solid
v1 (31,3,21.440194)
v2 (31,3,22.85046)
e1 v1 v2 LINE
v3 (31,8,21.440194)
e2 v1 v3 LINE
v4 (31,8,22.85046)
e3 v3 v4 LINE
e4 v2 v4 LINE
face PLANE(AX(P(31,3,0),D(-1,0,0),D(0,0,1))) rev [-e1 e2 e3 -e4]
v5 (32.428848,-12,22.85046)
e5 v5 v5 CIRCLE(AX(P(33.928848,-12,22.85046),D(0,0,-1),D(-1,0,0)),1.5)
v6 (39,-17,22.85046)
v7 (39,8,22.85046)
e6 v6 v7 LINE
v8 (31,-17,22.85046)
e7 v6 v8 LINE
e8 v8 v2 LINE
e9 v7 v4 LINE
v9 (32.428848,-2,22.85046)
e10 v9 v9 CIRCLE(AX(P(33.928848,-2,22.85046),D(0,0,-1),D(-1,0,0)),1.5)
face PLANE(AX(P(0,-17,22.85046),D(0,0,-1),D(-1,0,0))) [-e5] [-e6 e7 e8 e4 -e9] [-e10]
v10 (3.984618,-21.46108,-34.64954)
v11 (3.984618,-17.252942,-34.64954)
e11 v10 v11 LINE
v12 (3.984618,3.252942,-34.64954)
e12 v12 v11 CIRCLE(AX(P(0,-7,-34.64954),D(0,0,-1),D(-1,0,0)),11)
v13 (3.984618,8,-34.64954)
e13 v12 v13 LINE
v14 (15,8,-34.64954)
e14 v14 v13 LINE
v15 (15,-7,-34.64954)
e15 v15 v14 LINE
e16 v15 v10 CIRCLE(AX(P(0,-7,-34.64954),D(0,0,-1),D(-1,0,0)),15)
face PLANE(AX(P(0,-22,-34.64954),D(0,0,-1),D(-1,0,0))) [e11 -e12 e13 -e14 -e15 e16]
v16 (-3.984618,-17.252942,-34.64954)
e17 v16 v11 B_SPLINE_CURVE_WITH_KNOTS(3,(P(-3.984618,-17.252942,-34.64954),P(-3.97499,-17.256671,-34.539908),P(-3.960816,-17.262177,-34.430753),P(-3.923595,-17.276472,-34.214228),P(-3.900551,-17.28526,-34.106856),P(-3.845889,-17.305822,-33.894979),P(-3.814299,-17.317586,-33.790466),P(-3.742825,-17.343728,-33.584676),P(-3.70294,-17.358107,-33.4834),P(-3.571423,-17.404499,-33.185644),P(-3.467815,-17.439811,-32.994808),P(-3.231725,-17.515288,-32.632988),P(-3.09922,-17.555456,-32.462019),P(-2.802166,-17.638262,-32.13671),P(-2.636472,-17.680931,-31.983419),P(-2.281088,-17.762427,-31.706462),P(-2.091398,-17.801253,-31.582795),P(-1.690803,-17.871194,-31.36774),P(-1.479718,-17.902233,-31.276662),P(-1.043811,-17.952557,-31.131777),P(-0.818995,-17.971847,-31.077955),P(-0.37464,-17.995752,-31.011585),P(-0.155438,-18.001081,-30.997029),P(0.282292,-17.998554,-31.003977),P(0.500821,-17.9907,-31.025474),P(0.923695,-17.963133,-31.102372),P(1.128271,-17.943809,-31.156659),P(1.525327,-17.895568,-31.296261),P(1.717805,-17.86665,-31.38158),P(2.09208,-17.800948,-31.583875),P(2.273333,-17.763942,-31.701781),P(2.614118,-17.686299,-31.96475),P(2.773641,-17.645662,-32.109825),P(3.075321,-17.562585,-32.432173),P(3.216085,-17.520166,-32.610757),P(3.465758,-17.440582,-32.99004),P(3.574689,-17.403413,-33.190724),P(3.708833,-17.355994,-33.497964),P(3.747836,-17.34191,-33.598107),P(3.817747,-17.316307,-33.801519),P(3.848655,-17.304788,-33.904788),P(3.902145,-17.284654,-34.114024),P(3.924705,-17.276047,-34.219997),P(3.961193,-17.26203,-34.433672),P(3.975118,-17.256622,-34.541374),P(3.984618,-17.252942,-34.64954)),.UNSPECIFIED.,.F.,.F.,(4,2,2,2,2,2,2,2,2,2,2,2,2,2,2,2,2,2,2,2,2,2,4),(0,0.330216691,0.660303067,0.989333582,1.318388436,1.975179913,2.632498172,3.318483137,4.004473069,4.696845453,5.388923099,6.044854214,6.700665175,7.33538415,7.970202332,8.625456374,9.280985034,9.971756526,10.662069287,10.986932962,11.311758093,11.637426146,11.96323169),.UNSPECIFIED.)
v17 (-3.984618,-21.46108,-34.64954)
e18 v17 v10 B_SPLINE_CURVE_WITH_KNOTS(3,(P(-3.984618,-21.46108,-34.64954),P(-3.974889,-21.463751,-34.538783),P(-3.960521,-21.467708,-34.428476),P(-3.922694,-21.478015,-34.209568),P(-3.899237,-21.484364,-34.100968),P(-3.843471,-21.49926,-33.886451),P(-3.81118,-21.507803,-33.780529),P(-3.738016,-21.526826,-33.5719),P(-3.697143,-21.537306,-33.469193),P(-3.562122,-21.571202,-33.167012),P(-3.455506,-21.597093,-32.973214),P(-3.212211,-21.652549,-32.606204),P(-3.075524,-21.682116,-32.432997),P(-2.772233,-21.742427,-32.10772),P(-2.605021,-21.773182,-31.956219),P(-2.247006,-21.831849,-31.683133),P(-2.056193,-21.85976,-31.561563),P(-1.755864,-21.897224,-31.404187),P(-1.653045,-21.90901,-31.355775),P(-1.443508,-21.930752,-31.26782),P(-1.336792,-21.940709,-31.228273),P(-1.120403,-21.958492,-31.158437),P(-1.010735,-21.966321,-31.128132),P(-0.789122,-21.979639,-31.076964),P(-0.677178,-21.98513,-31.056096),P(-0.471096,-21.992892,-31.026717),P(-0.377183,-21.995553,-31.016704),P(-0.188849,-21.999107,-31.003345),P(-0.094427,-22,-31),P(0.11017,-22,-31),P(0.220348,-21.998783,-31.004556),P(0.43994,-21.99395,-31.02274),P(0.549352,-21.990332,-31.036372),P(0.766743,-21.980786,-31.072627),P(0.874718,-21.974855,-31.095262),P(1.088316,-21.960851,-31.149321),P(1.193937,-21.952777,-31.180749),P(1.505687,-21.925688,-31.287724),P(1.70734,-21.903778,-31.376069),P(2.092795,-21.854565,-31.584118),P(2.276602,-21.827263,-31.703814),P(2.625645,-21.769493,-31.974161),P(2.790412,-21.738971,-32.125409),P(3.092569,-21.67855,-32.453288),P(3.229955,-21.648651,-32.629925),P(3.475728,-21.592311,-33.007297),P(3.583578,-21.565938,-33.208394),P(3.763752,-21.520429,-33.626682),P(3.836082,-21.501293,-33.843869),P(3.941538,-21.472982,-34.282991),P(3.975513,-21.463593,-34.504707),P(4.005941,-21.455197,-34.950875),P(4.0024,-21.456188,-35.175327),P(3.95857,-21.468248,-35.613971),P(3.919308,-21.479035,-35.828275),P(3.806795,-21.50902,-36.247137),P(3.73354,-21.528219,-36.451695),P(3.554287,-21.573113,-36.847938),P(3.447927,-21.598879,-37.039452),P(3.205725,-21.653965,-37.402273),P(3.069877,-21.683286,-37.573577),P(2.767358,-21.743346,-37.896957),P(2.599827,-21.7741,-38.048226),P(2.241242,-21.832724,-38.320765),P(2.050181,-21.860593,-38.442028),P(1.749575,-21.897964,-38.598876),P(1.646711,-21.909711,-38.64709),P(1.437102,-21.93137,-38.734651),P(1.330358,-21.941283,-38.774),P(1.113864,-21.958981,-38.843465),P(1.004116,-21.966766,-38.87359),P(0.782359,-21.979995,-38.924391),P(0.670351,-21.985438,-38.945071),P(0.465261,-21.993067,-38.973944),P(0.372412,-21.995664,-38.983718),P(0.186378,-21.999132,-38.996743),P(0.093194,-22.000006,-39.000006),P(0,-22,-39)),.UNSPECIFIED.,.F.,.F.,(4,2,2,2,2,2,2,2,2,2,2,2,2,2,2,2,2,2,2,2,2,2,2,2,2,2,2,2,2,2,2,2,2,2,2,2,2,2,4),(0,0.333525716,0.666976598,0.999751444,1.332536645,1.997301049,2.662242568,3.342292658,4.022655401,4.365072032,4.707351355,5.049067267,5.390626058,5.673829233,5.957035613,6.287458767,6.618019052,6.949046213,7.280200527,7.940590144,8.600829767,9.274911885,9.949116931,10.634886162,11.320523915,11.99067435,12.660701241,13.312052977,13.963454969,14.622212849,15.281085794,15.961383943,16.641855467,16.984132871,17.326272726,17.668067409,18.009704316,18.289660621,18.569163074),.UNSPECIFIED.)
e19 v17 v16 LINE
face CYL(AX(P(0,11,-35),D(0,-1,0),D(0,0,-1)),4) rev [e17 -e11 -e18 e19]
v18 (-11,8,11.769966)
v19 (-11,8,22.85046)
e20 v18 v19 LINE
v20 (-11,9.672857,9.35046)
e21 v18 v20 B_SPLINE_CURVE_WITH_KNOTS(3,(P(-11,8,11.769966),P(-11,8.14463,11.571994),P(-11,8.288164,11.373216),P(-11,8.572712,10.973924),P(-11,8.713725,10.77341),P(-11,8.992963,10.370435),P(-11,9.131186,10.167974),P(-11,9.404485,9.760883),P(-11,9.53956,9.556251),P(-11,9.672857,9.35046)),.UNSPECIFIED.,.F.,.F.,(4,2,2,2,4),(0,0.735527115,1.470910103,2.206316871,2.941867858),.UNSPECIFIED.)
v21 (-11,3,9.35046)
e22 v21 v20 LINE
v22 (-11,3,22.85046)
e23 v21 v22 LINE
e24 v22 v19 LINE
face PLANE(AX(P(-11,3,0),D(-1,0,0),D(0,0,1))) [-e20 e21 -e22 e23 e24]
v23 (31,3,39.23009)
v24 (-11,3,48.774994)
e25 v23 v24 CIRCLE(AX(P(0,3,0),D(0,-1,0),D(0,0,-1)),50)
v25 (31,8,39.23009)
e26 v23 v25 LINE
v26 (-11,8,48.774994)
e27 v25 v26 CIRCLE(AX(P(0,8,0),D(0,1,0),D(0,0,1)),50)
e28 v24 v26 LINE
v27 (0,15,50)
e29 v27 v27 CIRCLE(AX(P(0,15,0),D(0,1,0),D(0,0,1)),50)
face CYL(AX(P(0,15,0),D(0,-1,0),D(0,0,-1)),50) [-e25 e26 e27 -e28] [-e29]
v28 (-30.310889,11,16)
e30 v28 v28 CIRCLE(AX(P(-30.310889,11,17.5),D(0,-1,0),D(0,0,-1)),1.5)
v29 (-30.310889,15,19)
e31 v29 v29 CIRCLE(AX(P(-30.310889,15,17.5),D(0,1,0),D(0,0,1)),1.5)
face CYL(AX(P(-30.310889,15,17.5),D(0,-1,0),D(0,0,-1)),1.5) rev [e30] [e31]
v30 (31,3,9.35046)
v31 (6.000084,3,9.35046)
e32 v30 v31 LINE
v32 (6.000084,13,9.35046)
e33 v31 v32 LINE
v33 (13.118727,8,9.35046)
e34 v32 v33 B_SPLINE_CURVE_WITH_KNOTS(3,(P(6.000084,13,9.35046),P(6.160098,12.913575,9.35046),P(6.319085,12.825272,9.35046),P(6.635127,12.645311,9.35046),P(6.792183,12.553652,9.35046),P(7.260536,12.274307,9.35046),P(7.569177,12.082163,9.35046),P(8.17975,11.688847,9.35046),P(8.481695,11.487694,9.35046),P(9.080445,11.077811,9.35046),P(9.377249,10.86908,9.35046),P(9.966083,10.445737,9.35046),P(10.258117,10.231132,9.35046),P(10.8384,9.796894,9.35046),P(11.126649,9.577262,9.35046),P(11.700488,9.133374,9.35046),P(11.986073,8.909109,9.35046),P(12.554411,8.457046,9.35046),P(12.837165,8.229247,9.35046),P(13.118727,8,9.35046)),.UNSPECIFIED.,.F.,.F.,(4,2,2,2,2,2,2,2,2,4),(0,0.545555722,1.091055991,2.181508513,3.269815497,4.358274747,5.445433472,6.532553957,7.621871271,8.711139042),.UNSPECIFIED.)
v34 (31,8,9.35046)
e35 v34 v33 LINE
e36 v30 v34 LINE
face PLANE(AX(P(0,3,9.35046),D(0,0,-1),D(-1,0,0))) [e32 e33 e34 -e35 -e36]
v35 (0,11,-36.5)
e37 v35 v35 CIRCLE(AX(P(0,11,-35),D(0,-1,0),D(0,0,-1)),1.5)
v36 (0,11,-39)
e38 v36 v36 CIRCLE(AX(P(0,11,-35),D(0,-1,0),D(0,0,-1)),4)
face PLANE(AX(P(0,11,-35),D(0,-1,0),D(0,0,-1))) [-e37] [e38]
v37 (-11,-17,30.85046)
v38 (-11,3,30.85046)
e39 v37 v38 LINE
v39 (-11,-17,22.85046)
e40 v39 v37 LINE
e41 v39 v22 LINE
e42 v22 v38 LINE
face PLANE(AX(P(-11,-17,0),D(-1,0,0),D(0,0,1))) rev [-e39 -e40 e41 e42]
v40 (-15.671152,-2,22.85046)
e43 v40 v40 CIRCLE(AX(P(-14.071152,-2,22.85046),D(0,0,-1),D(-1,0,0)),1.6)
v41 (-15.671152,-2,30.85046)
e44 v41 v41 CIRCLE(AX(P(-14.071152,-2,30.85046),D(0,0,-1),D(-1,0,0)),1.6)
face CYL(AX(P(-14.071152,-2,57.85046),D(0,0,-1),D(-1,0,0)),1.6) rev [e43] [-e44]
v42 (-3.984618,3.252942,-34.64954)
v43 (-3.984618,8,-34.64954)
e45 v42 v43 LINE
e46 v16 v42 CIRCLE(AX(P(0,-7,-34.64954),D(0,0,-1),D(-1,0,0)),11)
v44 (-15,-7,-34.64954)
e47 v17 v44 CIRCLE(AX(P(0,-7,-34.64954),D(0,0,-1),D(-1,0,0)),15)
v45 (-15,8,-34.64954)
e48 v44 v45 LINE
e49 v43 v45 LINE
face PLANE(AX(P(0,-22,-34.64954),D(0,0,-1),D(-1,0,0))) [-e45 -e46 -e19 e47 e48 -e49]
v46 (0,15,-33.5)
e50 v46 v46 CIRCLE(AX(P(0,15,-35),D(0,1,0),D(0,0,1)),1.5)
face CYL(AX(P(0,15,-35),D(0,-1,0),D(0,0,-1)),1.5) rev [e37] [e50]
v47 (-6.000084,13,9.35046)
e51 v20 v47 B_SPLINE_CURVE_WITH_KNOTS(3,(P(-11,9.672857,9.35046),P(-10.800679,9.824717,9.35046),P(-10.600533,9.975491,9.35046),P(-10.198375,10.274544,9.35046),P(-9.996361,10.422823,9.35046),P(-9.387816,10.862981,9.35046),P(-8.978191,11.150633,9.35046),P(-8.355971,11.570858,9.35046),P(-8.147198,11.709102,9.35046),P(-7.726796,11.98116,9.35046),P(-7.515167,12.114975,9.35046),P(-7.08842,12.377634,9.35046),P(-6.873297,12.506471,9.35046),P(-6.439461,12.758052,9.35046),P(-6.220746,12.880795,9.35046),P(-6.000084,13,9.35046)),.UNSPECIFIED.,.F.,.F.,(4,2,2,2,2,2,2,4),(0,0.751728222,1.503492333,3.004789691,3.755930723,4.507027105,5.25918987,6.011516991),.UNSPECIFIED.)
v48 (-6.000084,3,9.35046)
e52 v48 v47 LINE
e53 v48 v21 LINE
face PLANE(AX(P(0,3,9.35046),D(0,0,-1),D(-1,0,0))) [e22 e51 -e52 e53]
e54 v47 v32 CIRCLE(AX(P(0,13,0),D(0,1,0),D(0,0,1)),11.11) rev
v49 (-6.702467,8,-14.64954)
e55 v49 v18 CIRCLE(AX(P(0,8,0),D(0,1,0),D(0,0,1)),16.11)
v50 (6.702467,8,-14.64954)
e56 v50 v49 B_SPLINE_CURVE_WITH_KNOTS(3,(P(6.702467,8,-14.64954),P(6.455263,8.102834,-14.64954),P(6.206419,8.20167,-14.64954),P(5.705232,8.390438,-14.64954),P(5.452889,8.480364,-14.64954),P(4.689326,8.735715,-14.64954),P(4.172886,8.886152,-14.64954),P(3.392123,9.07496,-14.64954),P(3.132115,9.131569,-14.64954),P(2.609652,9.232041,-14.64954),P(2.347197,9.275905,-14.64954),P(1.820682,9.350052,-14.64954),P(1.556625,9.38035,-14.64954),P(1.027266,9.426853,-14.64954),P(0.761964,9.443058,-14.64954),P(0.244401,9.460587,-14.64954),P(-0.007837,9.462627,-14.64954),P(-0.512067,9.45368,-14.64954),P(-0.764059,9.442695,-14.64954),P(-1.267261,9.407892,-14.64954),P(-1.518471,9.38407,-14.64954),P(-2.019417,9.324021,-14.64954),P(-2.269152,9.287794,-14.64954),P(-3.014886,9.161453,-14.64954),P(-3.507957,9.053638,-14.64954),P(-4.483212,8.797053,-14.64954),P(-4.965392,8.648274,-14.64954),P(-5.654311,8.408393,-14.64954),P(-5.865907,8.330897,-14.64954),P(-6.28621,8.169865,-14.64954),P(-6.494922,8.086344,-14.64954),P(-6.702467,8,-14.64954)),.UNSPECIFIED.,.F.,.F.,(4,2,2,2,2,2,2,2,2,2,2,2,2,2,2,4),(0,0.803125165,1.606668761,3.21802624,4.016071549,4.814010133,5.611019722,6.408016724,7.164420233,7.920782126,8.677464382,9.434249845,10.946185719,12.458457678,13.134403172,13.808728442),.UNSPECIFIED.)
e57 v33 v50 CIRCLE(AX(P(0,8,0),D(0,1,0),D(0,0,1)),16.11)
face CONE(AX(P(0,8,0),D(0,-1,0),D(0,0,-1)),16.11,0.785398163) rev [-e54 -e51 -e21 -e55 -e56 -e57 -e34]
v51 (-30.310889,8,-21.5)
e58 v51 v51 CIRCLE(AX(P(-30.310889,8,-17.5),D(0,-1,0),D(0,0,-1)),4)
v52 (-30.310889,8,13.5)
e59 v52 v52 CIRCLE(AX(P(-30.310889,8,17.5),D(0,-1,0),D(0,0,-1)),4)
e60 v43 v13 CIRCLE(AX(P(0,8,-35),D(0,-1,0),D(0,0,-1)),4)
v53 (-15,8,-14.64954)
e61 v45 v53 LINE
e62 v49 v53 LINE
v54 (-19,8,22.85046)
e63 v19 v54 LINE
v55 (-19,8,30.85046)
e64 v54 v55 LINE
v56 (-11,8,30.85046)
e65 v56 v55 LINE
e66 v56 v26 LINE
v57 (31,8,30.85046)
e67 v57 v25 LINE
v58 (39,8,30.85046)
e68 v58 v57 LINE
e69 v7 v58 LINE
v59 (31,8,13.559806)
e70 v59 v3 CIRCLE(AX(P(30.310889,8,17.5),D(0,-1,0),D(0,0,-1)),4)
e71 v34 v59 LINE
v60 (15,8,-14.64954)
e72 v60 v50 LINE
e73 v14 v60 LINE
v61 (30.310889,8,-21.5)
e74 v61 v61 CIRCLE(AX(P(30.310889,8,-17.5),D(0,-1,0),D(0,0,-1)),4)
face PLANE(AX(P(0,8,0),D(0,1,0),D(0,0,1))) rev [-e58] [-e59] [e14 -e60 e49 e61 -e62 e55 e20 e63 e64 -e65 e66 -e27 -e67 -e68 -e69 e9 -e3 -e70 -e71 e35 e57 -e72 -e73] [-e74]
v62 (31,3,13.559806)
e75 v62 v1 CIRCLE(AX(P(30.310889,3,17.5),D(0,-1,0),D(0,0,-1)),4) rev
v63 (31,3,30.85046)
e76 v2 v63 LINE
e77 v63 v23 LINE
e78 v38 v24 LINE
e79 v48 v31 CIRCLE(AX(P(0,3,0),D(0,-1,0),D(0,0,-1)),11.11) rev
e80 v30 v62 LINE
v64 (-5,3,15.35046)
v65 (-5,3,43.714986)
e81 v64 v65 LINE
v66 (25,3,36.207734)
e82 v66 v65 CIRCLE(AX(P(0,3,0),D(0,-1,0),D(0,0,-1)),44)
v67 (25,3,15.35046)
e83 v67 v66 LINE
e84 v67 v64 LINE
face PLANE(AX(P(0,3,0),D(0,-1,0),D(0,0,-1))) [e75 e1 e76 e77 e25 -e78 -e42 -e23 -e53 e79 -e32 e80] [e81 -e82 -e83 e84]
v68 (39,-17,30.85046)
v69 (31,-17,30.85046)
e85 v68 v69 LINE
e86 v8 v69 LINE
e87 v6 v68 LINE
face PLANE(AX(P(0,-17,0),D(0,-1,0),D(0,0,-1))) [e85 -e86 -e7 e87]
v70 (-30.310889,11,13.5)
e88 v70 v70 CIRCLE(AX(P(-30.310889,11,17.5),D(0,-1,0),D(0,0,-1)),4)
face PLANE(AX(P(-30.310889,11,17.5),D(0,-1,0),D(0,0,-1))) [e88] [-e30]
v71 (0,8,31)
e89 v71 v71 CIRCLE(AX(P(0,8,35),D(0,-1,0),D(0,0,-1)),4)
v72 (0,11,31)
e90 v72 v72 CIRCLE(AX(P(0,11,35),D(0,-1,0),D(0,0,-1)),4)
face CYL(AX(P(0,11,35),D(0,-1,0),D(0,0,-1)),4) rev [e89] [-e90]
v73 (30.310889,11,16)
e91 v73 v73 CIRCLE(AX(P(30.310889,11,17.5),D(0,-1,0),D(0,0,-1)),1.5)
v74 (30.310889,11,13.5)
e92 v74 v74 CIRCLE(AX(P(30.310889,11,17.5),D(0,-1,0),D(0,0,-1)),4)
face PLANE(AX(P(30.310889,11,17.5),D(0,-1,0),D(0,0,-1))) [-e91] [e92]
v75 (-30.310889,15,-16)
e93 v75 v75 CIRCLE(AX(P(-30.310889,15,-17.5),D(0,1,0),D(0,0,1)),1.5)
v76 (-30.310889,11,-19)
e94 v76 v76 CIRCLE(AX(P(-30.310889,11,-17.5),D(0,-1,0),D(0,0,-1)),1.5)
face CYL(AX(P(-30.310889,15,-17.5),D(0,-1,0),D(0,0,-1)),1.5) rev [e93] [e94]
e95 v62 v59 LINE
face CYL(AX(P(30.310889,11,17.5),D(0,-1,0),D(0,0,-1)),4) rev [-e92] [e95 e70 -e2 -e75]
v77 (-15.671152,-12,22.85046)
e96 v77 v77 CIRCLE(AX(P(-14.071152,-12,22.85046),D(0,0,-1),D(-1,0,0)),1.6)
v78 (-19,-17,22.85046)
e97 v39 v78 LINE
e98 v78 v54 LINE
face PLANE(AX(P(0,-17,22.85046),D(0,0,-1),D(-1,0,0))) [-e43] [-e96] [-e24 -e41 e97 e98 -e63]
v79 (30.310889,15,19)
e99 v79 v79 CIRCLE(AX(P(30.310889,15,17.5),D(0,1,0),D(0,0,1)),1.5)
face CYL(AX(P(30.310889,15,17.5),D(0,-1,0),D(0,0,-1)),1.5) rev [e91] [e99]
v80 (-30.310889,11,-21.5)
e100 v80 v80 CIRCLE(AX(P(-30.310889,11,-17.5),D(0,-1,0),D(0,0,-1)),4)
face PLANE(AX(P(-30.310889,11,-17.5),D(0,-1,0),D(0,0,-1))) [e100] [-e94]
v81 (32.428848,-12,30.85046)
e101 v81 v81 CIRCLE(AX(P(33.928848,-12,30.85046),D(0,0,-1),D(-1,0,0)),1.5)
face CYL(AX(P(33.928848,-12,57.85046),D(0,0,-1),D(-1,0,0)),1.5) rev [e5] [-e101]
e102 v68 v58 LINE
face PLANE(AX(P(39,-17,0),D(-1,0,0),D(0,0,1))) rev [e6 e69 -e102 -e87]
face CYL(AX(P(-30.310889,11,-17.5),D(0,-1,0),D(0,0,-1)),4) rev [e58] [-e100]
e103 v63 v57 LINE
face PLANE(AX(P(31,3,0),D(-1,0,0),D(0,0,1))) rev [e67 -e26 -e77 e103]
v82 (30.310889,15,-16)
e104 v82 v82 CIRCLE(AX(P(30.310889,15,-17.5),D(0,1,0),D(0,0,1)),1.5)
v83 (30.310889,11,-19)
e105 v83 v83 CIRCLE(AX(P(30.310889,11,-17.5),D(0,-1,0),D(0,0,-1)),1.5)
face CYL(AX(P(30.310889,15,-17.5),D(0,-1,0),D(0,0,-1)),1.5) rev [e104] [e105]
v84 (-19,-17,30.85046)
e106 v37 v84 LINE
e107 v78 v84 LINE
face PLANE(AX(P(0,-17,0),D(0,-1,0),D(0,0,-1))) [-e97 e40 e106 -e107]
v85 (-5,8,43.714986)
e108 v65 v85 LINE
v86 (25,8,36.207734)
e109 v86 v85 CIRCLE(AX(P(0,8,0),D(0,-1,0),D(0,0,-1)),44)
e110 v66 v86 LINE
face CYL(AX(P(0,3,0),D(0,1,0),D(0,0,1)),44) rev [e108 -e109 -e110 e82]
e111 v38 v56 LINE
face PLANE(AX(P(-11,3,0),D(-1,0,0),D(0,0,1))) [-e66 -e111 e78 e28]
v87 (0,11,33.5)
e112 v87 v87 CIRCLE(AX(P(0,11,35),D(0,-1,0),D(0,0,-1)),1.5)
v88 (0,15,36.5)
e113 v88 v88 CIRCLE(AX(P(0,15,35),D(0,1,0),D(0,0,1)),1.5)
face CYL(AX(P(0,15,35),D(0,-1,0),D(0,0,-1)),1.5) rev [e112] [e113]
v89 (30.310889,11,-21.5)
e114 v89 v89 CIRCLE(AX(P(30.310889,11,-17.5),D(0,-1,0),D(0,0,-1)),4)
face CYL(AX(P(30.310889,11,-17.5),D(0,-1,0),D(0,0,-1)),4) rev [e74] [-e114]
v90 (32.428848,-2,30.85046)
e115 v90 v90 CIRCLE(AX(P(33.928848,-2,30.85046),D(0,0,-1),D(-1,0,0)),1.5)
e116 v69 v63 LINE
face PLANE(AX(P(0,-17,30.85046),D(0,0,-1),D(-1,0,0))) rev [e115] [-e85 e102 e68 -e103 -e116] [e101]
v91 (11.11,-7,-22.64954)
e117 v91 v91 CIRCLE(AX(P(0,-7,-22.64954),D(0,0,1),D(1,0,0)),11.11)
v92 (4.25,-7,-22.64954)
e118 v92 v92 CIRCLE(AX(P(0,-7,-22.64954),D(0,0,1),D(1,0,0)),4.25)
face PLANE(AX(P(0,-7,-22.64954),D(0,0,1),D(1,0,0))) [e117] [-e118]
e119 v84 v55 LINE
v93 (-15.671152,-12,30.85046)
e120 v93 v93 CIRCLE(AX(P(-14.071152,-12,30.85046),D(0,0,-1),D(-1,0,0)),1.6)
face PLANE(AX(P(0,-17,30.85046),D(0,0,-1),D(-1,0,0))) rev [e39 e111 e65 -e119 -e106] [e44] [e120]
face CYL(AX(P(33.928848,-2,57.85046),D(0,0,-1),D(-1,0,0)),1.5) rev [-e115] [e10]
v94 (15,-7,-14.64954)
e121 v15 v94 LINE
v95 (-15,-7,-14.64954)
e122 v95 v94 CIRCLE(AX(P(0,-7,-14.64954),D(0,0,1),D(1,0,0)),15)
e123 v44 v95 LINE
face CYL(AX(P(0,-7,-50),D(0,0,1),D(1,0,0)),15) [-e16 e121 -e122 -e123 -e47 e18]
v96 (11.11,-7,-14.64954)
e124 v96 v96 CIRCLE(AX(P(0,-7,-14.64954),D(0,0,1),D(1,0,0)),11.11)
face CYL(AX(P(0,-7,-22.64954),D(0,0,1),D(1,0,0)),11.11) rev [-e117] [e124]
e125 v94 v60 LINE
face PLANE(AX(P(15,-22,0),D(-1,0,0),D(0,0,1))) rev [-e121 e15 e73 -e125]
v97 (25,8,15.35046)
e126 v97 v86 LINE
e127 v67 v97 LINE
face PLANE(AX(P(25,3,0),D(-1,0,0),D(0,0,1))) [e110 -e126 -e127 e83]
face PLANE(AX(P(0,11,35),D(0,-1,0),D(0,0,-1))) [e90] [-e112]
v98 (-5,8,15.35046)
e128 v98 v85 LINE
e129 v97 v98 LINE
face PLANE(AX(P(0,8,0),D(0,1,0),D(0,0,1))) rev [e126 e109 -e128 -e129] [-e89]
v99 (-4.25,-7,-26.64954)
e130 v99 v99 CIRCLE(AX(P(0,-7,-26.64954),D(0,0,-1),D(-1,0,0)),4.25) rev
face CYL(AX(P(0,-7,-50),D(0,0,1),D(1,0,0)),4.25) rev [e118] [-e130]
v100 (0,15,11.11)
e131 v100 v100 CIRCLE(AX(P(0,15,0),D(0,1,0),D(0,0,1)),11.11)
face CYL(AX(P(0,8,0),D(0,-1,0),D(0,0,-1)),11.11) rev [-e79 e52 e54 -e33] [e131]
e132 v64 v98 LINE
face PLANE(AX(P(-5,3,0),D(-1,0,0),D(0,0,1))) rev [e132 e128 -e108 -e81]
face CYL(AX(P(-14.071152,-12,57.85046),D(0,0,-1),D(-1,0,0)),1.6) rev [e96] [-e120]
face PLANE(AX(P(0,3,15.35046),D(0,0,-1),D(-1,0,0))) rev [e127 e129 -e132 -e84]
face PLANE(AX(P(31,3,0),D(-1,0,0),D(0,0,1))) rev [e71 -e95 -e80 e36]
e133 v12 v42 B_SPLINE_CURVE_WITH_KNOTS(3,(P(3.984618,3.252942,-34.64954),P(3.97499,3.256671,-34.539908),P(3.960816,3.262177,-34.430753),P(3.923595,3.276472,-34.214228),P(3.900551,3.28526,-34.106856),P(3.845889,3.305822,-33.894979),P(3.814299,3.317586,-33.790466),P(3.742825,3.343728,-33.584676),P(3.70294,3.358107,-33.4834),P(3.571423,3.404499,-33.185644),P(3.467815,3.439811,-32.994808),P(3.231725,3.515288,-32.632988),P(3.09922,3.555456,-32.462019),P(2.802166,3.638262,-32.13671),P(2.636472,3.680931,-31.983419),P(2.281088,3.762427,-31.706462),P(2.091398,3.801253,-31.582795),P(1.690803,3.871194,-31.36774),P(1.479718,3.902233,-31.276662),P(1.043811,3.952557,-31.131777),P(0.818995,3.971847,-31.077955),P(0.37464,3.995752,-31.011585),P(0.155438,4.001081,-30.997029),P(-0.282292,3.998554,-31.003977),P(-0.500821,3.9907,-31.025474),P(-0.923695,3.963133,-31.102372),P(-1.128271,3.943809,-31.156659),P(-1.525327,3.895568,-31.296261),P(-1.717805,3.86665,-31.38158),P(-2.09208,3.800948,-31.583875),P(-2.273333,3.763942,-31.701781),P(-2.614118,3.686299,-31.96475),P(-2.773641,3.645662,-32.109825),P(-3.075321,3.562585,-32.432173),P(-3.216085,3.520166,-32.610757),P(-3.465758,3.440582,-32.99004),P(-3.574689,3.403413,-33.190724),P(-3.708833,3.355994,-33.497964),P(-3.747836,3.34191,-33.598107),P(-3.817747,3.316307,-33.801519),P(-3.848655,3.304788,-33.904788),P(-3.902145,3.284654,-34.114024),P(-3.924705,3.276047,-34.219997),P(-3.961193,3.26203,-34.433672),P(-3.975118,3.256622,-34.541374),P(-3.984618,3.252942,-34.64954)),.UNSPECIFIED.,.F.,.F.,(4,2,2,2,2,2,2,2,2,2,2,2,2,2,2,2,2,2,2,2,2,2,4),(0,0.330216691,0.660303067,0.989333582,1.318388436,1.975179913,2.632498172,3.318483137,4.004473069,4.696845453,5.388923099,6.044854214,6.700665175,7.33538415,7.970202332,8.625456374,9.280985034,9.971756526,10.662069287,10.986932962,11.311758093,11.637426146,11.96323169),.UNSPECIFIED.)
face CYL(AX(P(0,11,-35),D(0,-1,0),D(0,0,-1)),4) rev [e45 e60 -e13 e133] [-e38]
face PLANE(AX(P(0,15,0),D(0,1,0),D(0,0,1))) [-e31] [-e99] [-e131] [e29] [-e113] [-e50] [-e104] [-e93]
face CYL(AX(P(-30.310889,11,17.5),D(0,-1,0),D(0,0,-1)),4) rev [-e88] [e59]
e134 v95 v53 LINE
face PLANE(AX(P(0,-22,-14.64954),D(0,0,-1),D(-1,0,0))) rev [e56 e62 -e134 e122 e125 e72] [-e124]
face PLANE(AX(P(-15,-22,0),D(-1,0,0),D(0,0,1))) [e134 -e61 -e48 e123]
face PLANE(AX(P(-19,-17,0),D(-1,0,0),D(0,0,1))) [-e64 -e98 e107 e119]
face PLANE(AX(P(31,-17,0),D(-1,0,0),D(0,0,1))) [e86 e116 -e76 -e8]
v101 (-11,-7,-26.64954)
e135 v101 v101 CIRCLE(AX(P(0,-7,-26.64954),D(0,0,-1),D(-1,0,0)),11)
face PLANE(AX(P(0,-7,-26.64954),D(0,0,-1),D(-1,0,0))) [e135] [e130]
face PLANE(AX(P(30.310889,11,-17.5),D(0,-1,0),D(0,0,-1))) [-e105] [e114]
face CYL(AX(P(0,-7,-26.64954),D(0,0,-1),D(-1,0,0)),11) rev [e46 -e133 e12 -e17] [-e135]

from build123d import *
from build123d.topology import SkipClean

# Parameters (mm, degrees)
SKETCH1_R           = 11.11
BOSS_EXTRUDE1_DEPTH = 8
SKETCH2_R           = 50
SKETCH2_R_2         = 11.11
SKETCH2_R_3         = 1.5
BOSS_EXTRUDE2_DEPTH = 7
SKETCH3_R           = 4
CUT_EXTRUDE1_DEPTH  = 3
SKETCH1_3_R         = 11.11
CUT_EXTRUDE2_DEPTH  = 8
BOSS_EXTRUDE4_DEPTH = 5
SKETCH5_4_W         = 8
SKETCH5_4_H         = 8
BOSS_EXTRUDE5_DEPTH = 25
SKETCH5_5_W         = 8
SKETCH5_5_H         = 8
BOSS_EXTRUDE6_DEPTH = 7
SKETCH8_R           = 1.6
SKETCH8_R_2         = 1.5
CUT_EXTRUDE3_DEPTH  = 35
BOSS_EXTRUDE7_DEPTH = 30
CHAMFER3_SIZE       = 5
SKETCH9_R           = 11.11
SKETCH9_R_2         = 4.25
CUT_EXTRUDE4_DEPTH  = 8
SKETCH9_2_R         = 4.25
CUT_EXTRUDE5_DEPTH  = 85.637834707
SKETCH11_R          = 11
CUT_EXTRUDE6_DEPTH  = 8
CUT_EXTRUDE9_DEPTH  = 85.637834733


# Read off the part's stored shape, not the designer's step: Boss-Extrude4, Boss-Extrude7
with BuildPart() as part:
    # Sketch1 → Boss-Extrude1 (new body)
    with BuildSketch(Plane(origin=(0, 0, 0), x_dir=(1, 0, 0), z_dir=(0, 1, 0))):
        with BuildLine():
            Line((-0.88, 15.975781671), (-0.5, 17.975781671))
            Line((-0.5, 17.975781671), (0.5, 17.975781671))
            Line((0.5, 17.975781671), (0.88, 15.975781671))
            ThreePointArc((0.88, 15.975781671), (1.394491884, 15.939115169), (1.907534551, 15.885884046))
            Line((1.907534551, 15.885884046), (2.629057853, 17.789513245))
            Line((2.629057853, 17.789513245), (3.613865606, 17.615865067))
            Line((3.613865606, 17.615865067), (3.640796197, 15.580263254))
            ThreePointArc((3.640796197, 15.580263254), (4.141104722, 15.454813221), (4.637109631, 15.313301874))
            Line((4.637109631, 15.313301874), (5.678233113, 17.062719461))
            Line((5.678233113, 17.062719461), (6.617925734, 16.720699317))
            Line((6.617925734, 16.720699317), (6.290968643, 14.711346421))
            ThreePointArc((6.290968643, 14.711346421), (6.761892188, 14.500924593), (7.22578848, 14.275432772))
            Line((7.22578848, 14.275432772), (8.554878134, 15.81748358))
            Line((8.554878134, 15.81748358), (9.420903537, 15.31748358))
            Line((9.420903537, 15.31748358), (8.749993191, 13.395432772))
            ThreePointArc((8.749993191, 13.395432772), (9.177222982, 13.106432709), (9.594915403, 12.80381187))
            Line((9.594915403, 12.80381187), (11.171587511, 14.091641465))
            Line((11.171587511, 14.091641465), (11.937631954, 13.448853855))
            Line((11.937631954, 13.448853855), (10.943153623, 11.672505677))
            ThreePointArc((10.943153623, 11.672505677), (11.313708499, 11.313708499), (11.672505677, 10.943153623))
            Line((11.672505677, 10.943153623), (13.448853855, 11.937631954))
            Line((13.448853855, 11.937631954), (14.091641465, 11.171587511))
            Line((14.091641465, 11.171587511), (12.80381187, 9.594915403))
            ThreePointArc((12.80381187, 9.594915403), (13.106432709, 9.177222982), (13.395432772, 8.749993191))
            Line((13.395432772, 8.749993191), (15.31748358, 9.420903537))
            Line((15.31748358, 9.420903537), (15.81748358, 8.554878134))
            Line((15.81748358, 8.554878134), (14.275432772, 7.22578848))
            ThreePointArc((14.275432772, 7.22578848), (14.500924593, 6.761892188), (14.711346421, 6.290968643))
            Line((14.711346421, 6.290968643), (16.720699317, 6.617925734))
            Line((16.720699317, 6.617925734), (17.062719461, 5.678233113))
            Line((17.062719461, 5.678233113), (15.313301874, 4.637109631))
            ThreePointArc((15.313301874, 4.637109631), (15.454813221, 4.141104722), (15.580263254, 3.640796197))
            Line((15.580263254, 3.640796197), (17.615865067, 3.613865606))
            Line((17.615865067, 3.613865606), (17.789513245, 2.629057853))
            Line((17.789513245, 2.629057853), (15.885884046, 1.907534551))
            ThreePointArc((15.885884046, 1.907534551), (15.939115169, 1.394491884), (15.975781671, 0.88))
            Line((15.975781671, 0.88), (17.975781671, 0.5))
            Line((17.975781671, 0.5), (17.975781671, -0.5))
            Line((17.975781671, -0.5), (15.975781671, -0.88))
            ThreePointArc((15.975781671, -0.88), (15.939115169, -1.394491884), (15.885884046, -1.907534551))
            Line((15.885884046, -1.907534551), (17.789513245, -2.629057853))
            Line((17.789513245, -2.629057853), (17.615865067, -3.613865606))
            Line((17.615865067, -3.613865606), (15.580263254, -3.640796197))
            ThreePointArc((15.580263254, -3.640796197), (15.454813221, -4.141104722), (15.313301874, -4.637109631))
            Line((15.313301874, -4.637109631), (17.062719461, -5.678233113))
            Line((17.062719461, -5.678233113), (16.720699317, -6.617925734))
            Line((16.720699317, -6.617925734), (14.711346421, -6.290968643))
            ThreePointArc((14.711346421, -6.290968643), (14.500924593, -6.761892188), (14.275432772, -7.22578848))
            Line((14.275432772, -7.22578848), (15.81748358, -8.554878134))
            Line((15.81748358, -8.554878134), (15.31748358, -9.420903537))
            Line((15.31748358, -9.420903537), (13.395432772, -8.749993191))
            ThreePointArc((13.395432772, -8.749993191), (13.106432709, -9.177222982), (12.80381187, -9.594915403))
            Line((12.80381187, -9.594915403), (14.091641465, -11.171587511))
            Line((14.091641465, -11.171587511), (13.448853855, -11.937631954))
            Line((13.448853855, -11.937631954), (11.672505677, -10.943153623))
            ThreePointArc((11.672505677, -10.943153623), (11.313708499, -11.313708499), (10.943153623, -11.672505677))
            Line((10.943153623, -11.672505677), (11.937631954, -13.448853855))
            Line((11.937631954, -13.448853855), (11.171587511, -14.091641465))
            Line((11.171587511, -14.091641465), (9.594915403, -12.80381187))
            ThreePointArc((9.594915403, -12.80381187), (9.177222982, -13.106432709), (8.749993191, -13.395432772))
            Line((8.749993191, -13.395432772), (9.420903537, -15.31748358))
            Line((9.420903537, -15.31748358), (8.554878134, -15.81748358))
            Line((8.554878134, -15.81748358), (7.22578848, -14.275432772))
            ThreePointArc((7.22578848, -14.275432772), (6.761892188, -14.500924593), (6.290968643, -14.711346421))
            Line((6.290968643, -14.711346421), (6.617925734, -16.720699317))
            Line((6.617925734, -16.720699317), (5.678233113, -17.062719461))
            Line((5.678233113, -17.062719461), (4.637109631, -15.313301874))
            ThreePointArc((4.637109631, -15.313301874), (4.141104722, -15.454813221), (3.640796197, -15.580263254))
            Line((3.640796197, -15.580263254), (3.613865606, -17.615865067))
            Line((3.613865606, -17.615865067), (2.629057853, -17.789513245))
            Line((2.629057853, -17.789513245), (1.907534551, -15.885884046))
            ThreePointArc((1.907534551, -15.885884046), (1.394491884, -15.939115169), (0.88, -15.975781671))
            Line((0.88, -15.975781671), (0.5, -17.975781671))
            Line((0.5, -17.975781671), (-0.5, -17.975781671))
            Line((-0.5, -17.975781671), (-0.88, -15.975781671))
            ThreePointArc((-0.88, -15.975781671), (-1.394491884, -15.939115169), (-1.907534551, -15.885884046))
            Line((-1.907534551, -15.885884046), (-2.629057853, -17.789513245))
            Line((-2.629057853, -17.789513245), (-3.613865606, -17.615865067))
            Line((-3.613865606, -17.615865067), (-3.640796197, -15.580263254))
            ThreePointArc((-3.640796197, -15.580263254), (-4.141104722, -15.454813221), (-4.637109631, -15.313301874))
            Line((-4.637109631, -15.313301874), (-5.678233113, -17.062719461))
            Line((-5.678233113, -17.062719461), (-6.617925734, -16.720699317))
            Line((-6.617925734, -16.720699317), (-6.290968643, -14.711346421))
            ThreePointArc((-6.290968643, -14.711346421), (-6.761892188, -14.500924593), (-7.22578848, -14.275432772))
            Line((-7.22578848, -14.275432772), (-8.554878134, -15.81748358))
            Line((-8.554878134, -15.81748358), (-9.420903537, -15.31748358))
            Line((-9.420903537, -15.31748358), (-8.749993191, -13.395432772))
            ThreePointArc((-8.749993191, -13.395432772), (-9.177222982, -13.106432709), (-9.594915403, -12.80381187))
            Line((-9.594915403, -12.80381187), (-11.171587511, -14.091641465))
            Line((-11.171587511, -14.091641465), (-11.937631954, -13.448853855))
            Line((-11.937631954, -13.448853855), (-10.943153623, -11.672505677))
            ThreePointArc((-10.943153623, -11.672505677), (-11.313708499, -11.313708499), (-11.672505677, -10.943153623))
            Line((-11.672505677, -10.943153623), (-13.448853855, -11.937631954))
            Line((-13.448853855, -11.937631954), (-14.091641465, -11.171587511))
            Line((-14.091641465, -11.171587511), (-12.80381187, -9.594915403))
            ThreePointArc((-12.80381187, -9.594915403), (-13.106432709, -9.177222982), (-13.395432772, -8.749993191))
            Line((-13.395432772, -8.749993191), (-15.31748358, -9.420903537))
            Line((-15.31748358, -9.420903537), (-15.81748358, -8.554878134))
            Line((-15.81748358, -8.554878134), (-14.275432772, -7.22578848))
            ThreePointArc((-14.275432772, -7.22578848), (-14.500924593, -6.761892188), (-14.711346421, -6.290968643))
            Line((-14.711346421, -6.290968643), (-16.720699317, -6.617925734))
            Line((-16.720699317, -6.617925734), (-17.062719461, -5.678233113))
            Line((-17.062719461, -5.678233113), (-15.313301874, -4.637109631))
            ThreePointArc((-15.313301874, -4.637109631), (-15.454813221, -4.141104722), (-15.580263254, -3.640796197))
            Line((-15.580263254, -3.640796197), (-17.615865067, -3.613865606))
            Line((-17.615865067, -3.613865606), (-17.789513245, -2.629057853))
            Line((-17.789513245, -2.629057853), (-15.885884046, -1.907534551))
            ThreePointArc((-15.885884046, -1.907534551), (-15.939115169, -1.394491884), (-15.975781671, -0.88))
            Line((-15.975781671, -0.88), (-17.975781671, -0.5))
            Line((-17.975781671, -0.5), (-17.975781671, 0.5))
            Line((-17.975781671, 0.5), (-15.975781671, 0.88))
            ThreePointArc((-15.975781671, 0.88), (-15.939115169, 1.394491884), (-15.885884046, 1.907534551))
            Line((-15.885884046, 1.907534551), (-17.789513245, 2.629057853))
            Line((-17.789513245, 2.629057853), (-17.615865067, 3.613865606))
            Line((-17.615865067, 3.613865606), (-15.580263254, 3.640796197))
            ThreePointArc((-15.580263254, 3.640796197), (-15.454813221, 4.141104722), (-15.313301874, 4.637109631))
            Line((-15.313301874, 4.637109631), (-17.062719461, 5.678233113))
            Line((-17.062719461, 5.678233113), (-16.720699317, 6.617925734))
            Line((-16.720699317, 6.617925734), (-14.711346421, 6.290968643))
            ThreePointArc((-14.711346421, 6.290968643), (-14.500924593, 6.761892188), (-14.275432772, 7.22578848))
            Line((-14.275432772, 7.22578848), (-15.81748358, 8.554878134))
            Line((-15.81748358, 8.554878134), (-15.31748358, 9.420903537))
            Line((-15.31748358, 9.420903537), (-13.395432772, 8.749993191))
            ThreePointArc((-13.395432772, 8.749993191), (-13.106432709, 9.177222982), (-12.80381187, 9.594915403))
            Line((-12.80381187, 9.594915403), (-14.091641465, 11.171587511))
            Line((-14.091641465, 11.171587511), (-13.448853855, 11.937631954))
            Line((-13.448853855, 11.937631954), (-11.672505677, 10.943153623))
            ThreePointArc((-11.672505677, 10.943153623), (-11.313708499, 11.313708499), (-10.943153623, 11.672505677))
            Line((-10.943153623, 11.672505677), (-11.937631954, 13.448853855))
            Line((-11.937631954, 13.448853855), (-11.171587511, 14.091641465))
            Line((-11.171587511, 14.091641465), (-9.594915403, 12.80381187))
            ThreePointArc((-9.594915403, 12.80381187), (-9.177222982, 13.106432709), (-8.749993191, 13.395432772))
            Line((-8.749993191, 13.395432772), (-9.420903537, 15.31748358))
            Line((-9.420903537, 15.31748358), (-8.554878134, 15.81748358))
            Line((-8.554878134, 15.81748358), (-7.22578848, 14.275432772))
            ThreePointArc((-7.22578848, 14.275432772), (-6.761892188, 14.500924593), (-6.290968643, 14.711346421))
            Line((-6.290968643, 14.711346421), (-6.617925734, 16.720699317))
            Line((-6.617925734, 16.720699317), (-5.678233113, 17.062719461))
            Line((-5.678233113, 17.062719461), (-4.637109631, 15.313301874))
            ThreePointArc((-4.637109631, 15.313301874), (-4.141104722, 15.454813221), (-3.640796197, 15.580263254))
            Line((-3.640796197, 15.580263254), (-3.613865606, 17.615865067))
            Line((-3.613865606, 17.615865067), (-2.629057853, 17.789513245))
            Line((-2.629057853, 17.789513245), (-1.907534551, 15.885884046))
            ThreePointArc((-1.907534551, 15.885884046), (-1.394491884, 15.939115169), (-0.88, 15.975781671))
        make_face()
        with Locations(Location((0, 0, 0), (0, 0, 270))):
            Circle(SKETCH1_R, mode=Mode.SUBTRACT)
    extrude(amount=BOSS_EXTRUDE1_DEPTH)

    # Sketch2 → Boss-Extrude2 (add)
    with BuildSketch(Plane(origin=(0, 8, 0), x_dir=(1, 0, 0), z_dir=(0, 1, 0))):
        with Locations(Location((0, 0, 0), (0, 0, 270))):
            Circle(SKETCH2_R)
        with Locations(Location((0, 0, 0), (0, 0, 270))):
            Circle(SKETCH2_R_2, mode=Mode.SUBTRACT)
        with Locations(Location((0, 35, 0), (0, 0, 270))):
            Circle(SKETCH2_R_3, mode=Mode.SUBTRACT)
        with Locations(Location((30.310889132, 17.5, 0), (0, 0, 270))):
            Circle(SKETCH2_R_3, mode=Mode.SUBTRACT)
        with Locations(Location((30.310889132, -17.5, 0), (0, 0, 270))):
            Circle(SKETCH2_R_3, mode=Mode.SUBTRACT)
        with Locations(Location((0, -35, 0), (0, 0, 270))):
            Circle(SKETCH2_R_3, mode=Mode.SUBTRACT)
        with Locations(Location((-30.310889132, -17.5, 0), (0, 0, 270))):
            Circle(SKETCH2_R_3, mode=Mode.SUBTRACT)
        with Locations(Location((-30.310889132, 17.5, 0), (0, 0, 270))):
            Circle(SKETCH2_R_3, mode=Mode.SUBTRACT)
    extrude(amount=BOSS_EXTRUDE2_DEPTH)

    # Sketch3 → Cut-Extrude1 (cut)
    with BuildSketch(Plane(origin=(0, 8, 0), x_dir=(-1, 0, 0), z_dir=(0, -1, 0))):
        with Locations(Location((0, -35, 0), (0, 0, 90))):
            Circle(SKETCH3_R)
        with Locations(Location((-30.310889132, -17.5, 0), (0, 0, 90))):
            Circle(SKETCH3_R)
        with Locations(Location((-30.310889132, 17.5, 0), (0, 0, 90))):
            Circle(SKETCH3_R)
        with Locations(Location((0, 35, 0), (0, 0, 90))):
            Circle(SKETCH3_R)
        with Locations(Location((30.310889132, 17.5, 0), (0, 0, 90))):
            Circle(SKETCH3_R)
        with Locations(Location((30.310889132, -17.5, 0), (0, 0, 90))):
            Circle(SKETCH3_R)
    extrude(amount=-CUT_EXTRUDE1_DEPTH, mode=Mode.SUBTRACT)

    # Sketch1<3> → Cut-Extrude2 (cut)
    with BuildSketch(Plane(origin=(0, 0, 0), x_dir=(1, 0, 0), z_dir=(0, 1, 0))):
        with BuildLine():
            Line((-0.88, 15.975781671), (-0.5, 17.975781671))
            Line((-0.5, 17.975781671), (0.5, 17.975781671))
            Line((0.5, 17.975781671), (0.88, 15.975781671))
            ThreePointArc((0.88, 15.975781671), (1.394491884, 15.939115169), (1.907534551, 15.885884046))
            Line((1.907534551, 15.885884046), (2.629057853, 17.789513245))
            Line((2.629057853, 17.789513245), (3.613865606, 17.615865067))
            Line((3.613865606, 17.615865067), (3.640796197, 15.580263254))
            ThreePointArc((3.640796197, 15.580263254), (4.141104722, 15.454813221), (4.637109631, 15.313301874))
            Line((4.637109631, 15.313301874), (5.678233113, 17.062719461))
            Line((5.678233113, 17.062719461), (6.617925734, 16.720699317))
            Line((6.617925734, 16.720699317), (6.290968643, 14.711346421))
            ThreePointArc((6.290968643, 14.711346421), (6.761892188, 14.500924593), (7.22578848, 14.275432772))
            Line((7.22578848, 14.275432772), (8.554878134, 15.81748358))
            Line((8.554878134, 15.81748358), (9.420903537, 15.31748358))
            Line((9.420903537, 15.31748358), (8.749993191, 13.395432772))
            ThreePointArc((8.749993191, 13.395432772), (9.177222982, 13.106432709), (9.594915403, 12.80381187))
            Line((9.594915403, 12.80381187), (11.171587511, 14.091641465))
            Line((11.171587511, 14.091641465), (11.937631954, 13.448853855))
            Line((11.937631954, 13.448853855), (10.943153623, 11.672505677))
            ThreePointArc((10.943153623, 11.672505677), (11.313708499, 11.313708499), (11.672505677, 10.943153623))
            Line((11.672505677, 10.943153623), (13.448853855, 11.937631954))
            Line((13.448853855, 11.937631954), (14.091641465, 11.171587511))
            Line((14.091641465, 11.171587511), (12.80381187, 9.594915403))
            ThreePointArc((12.80381187, 9.594915403), (13.106432709, 9.177222982), (13.395432772, 8.749993191))
            Line((13.395432772, 8.749993191), (15.31748358, 9.420903537))
            Line((15.31748358, 9.420903537), (15.81748358, 8.554878134))
            Line((15.81748358, 8.554878134), (14.275432772, 7.22578848))
            ThreePointArc((14.275432772, 7.22578848), (14.500924593, 6.761892188), (14.711346421, 6.290968643))
            Line((14.711346421, 6.290968643), (16.720699317, 6.617925734))
            Line((16.720699317, 6.617925734), (17.062719461, 5.678233113))
            Line((17.062719461, 5.678233113), (15.313301874, 4.637109631))
            ThreePointArc((15.313301874, 4.637109631), (15.454813221, 4.141104722), (15.580263254, 3.640796197))
            Line((15.580263254, 3.640796197), (17.615865067, 3.613865606))
            Line((17.615865067, 3.613865606), (17.789513245, 2.629057853))
            Line((17.789513245, 2.629057853), (15.885884046, 1.907534551))
            ThreePointArc((15.885884046, 1.907534551), (15.939115169, 1.394491884), (15.975781671, 0.88))
            Line((15.975781671, 0.88), (17.975781671, 0.5))
            Line((17.975781671, 0.5), (17.975781671, -0.5))
            Line((17.975781671, -0.5), (15.975781671, -0.88))
            ThreePointArc((15.975781671, -0.88), (15.939115169, -1.394491884), (15.885884046, -1.907534551))
            Line((15.885884046, -1.907534551), (17.789513245, -2.629057853))
            Line((17.789513245, -2.629057853), (17.615865067, -3.613865606))
            Line((17.615865067, -3.613865606), (15.580263254, -3.640796197))
            ThreePointArc((15.580263254, -3.640796197), (15.454813221, -4.141104722), (15.313301874, -4.637109631))
            Line((15.313301874, -4.637109631), (17.062719461, -5.678233113))
            Line((17.062719461, -5.678233113), (16.720699317, -6.617925734))
            Line((16.720699317, -6.617925734), (14.711346421, -6.290968643))
            ThreePointArc((14.711346421, -6.290968643), (14.500924593, -6.761892188), (14.275432772, -7.22578848))
            Line((14.275432772, -7.22578848), (15.81748358, -8.554878134))
            Line((15.81748358, -8.554878134), (15.31748358, -9.420903537))
            Line((15.31748358, -9.420903537), (13.395432772, -8.749993191))
            ThreePointArc((13.395432772, -8.749993191), (13.106432709, -9.177222982), (12.80381187, -9.594915403))
            Line((12.80381187, -9.594915403), (14.091641465, -11.171587511))
            Line((14.091641465, -11.171587511), (13.448853855, -11.937631954))
            Line((13.448853855, -11.937631954), (11.672505677, -10.943153623))
            ThreePointArc((11.672505677, -10.943153623), (11.313708499, -11.313708499), (10.943153623, -11.672505677))
            Line((10.943153623, -11.672505677), (11.937631954, -13.448853855))
            Line((11.937631954, -13.448853855), (11.171587511, -14.091641465))
            Line((11.171587511, -14.091641465), (9.594915403, -12.80381187))
            ThreePointArc((9.594915403, -12.80381187), (9.177222982, -13.106432709), (8.749993191, -13.395432772))
            Line((8.749993191, -13.395432772), (9.420903537, -15.31748358))
            Line((9.420903537, -15.31748358), (8.554878134, -15.81748358))
            Line((8.554878134, -15.81748358), (7.22578848, -14.275432772))
            ThreePointArc((7.22578848, -14.275432772), (6.761892188, -14.500924593), (6.290968643, -14.711346421))
            Line((6.290968643, -14.711346421), (6.617925734, -16.720699317))
            Line((6.617925734, -16.720699317), (5.678233113, -17.062719461))
            Line((5.678233113, -17.062719461), (4.637109631, -15.313301874))
            ThreePointArc((4.637109631, -15.313301874), (4.141104722, -15.454813221), (3.640796197, -15.580263254))
            Line((3.640796197, -15.580263254), (3.613865606, -17.615865067))
            Line((3.613865606, -17.615865067), (2.629057853, -17.789513245))
            Line((2.629057853, -17.789513245), (1.907534551, -15.885884046))
            ThreePointArc((1.907534551, -15.885884046), (1.394491884, -15.939115169), (0.88, -15.975781671))
            Line((0.88, -15.975781671), (0.5, -17.975781671))
            Line((0.5, -17.975781671), (-0.5, -17.975781671))
            Line((-0.5, -17.975781671), (-0.88, -15.975781671))
            ThreePointArc((-0.88, -15.975781671), (-1.394491884, -15.939115169), (-1.907534551, -15.885884046))
            Line((-1.907534551, -15.885884046), (-2.629057853, -17.789513245))
            Line((-2.629057853, -17.789513245), (-3.613865606, -17.615865067))
            Line((-3.613865606, -17.615865067), (-3.640796197, -15.580263254))
            ThreePointArc((-3.640796197, -15.580263254), (-4.141104722, -15.454813221), (-4.637109631, -15.313301874))
            Line((-4.637109631, -15.313301874), (-5.678233113, -17.062719461))
            Line((-5.678233113, -17.062719461), (-6.617925734, -16.720699317))
            Line((-6.617925734, -16.720699317), (-6.290968643, -14.711346421))
            ThreePointArc((-6.290968643, -14.711346421), (-6.761892188, -14.500924593), (-7.22578848, -14.275432772))
            Line((-7.22578848, -14.275432772), (-8.554878134, -15.81748358))
            Line((-8.554878134, -15.81748358), (-9.420903537, -15.31748358))
            Line((-9.420903537, -15.31748358), (-8.749993191, -13.395432772))
            ThreePointArc((-8.749993191, -13.395432772), (-9.177222982, -13.106432709), (-9.594915403, -12.80381187))
            Line((-9.594915403, -12.80381187), (-11.171587511, -14.091641465))
            Line((-11.171587511, -14.091641465), (-11.937631954, -13.448853855))
            Line((-11.937631954, -13.448853855), (-10.943153623, -11.672505677))
            ThreePointArc((-10.943153623, -11.672505677), (-11.313708499, -11.313708499), (-11.672505677, -10.943153623))
            Line((-11.672505677, -10.943153623), (-13.448853855, -11.937631954))
            Line((-13.448853855, -11.937631954), (-14.091641465, -11.171587511))
            Line((-14.091641465, -11.171587511), (-12.80381187, -9.594915403))
            ThreePointArc((-12.80381187, -9.594915403), (-13.106432709, -9.177222982), (-13.395432772, -8.749993191))
            Line((-13.395432772, -8.749993191), (-15.31748358, -9.420903537))
            Line((-15.31748358, -9.420903537), (-15.81748358, -8.554878134))
            Line((-15.81748358, -8.554878134), (-14.275432772, -7.22578848))
            ThreePointArc((-14.275432772, -7.22578848), (-14.500924593, -6.761892188), (-14.711346421, -6.290968643))
            Line((-14.711346421, -6.290968643), (-16.720699317, -6.617925734))
            Line((-16.720699317, -6.617925734), (-17.062719461, -5.678233113))
            Line((-17.062719461, -5.678233113), (-15.313301874, -4.637109631))
            ThreePointArc((-15.313301874, -4.637109631), (-15.454813221, -4.141104722), (-15.580263254, -3.640796197))
            Line((-15.580263254, -3.640796197), (-17.615865067, -3.613865606))
            Line((-17.615865067, -3.613865606), (-17.789513245, -2.629057853))
            Line((-17.789513245, -2.629057853), (-15.885884046, -1.907534551))
            ThreePointArc((-15.885884046, -1.907534551), (-15.939115169, -1.394491884), (-15.975781671, -0.88))
            Line((-15.975781671, -0.88), (-17.975781671, -0.5))
            Line((-17.975781671, -0.5), (-17.975781671, 0.5))
            Line((-17.975781671, 0.5), (-15.975781671, 0.88))
            ThreePointArc((-15.975781671, 0.88), (-15.939115169, 1.394491884), (-15.885884046, 1.907534551))
            Line((-15.885884046, 1.907534551), (-17.789513245, 2.629057853))
            Line((-17.789513245, 2.629057853), (-17.615865067, 3.613865606))
            Line((-17.615865067, 3.613865606), (-15.580263254, 3.640796197))
            ThreePointArc((-15.580263254, 3.640796197), (-15.454813221, 4.141104722), (-15.313301874, 4.637109631))
            Line((-15.313301874, 4.637109631), (-17.062719461, 5.678233113))
            Line((-17.062719461, 5.678233113), (-16.720699317, 6.617925734))
            Line((-16.720699317, 6.617925734), (-14.711346421, 6.290968643))
            ThreePointArc((-14.711346421, 6.290968643), (-14.500924593, 6.761892188), (-14.275432772, 7.22578848))
            Line((-14.275432772, 7.22578848), (-15.81748358, 8.554878134))
            Line((-15.81748358, 8.554878134), (-15.31748358, 9.420903537))
            Line((-15.31748358, 9.420903537), (-13.395432772, 8.749993191))
            ThreePointArc((-13.395432772, 8.749993191), (-13.106432709, 9.177222982), (-12.80381187, 9.594915403))
            Line((-12.80381187, 9.594915403), (-14.091641465, 11.171587511))
            Line((-14.091641465, 11.171587511), (-13.448853855, 11.937631954))
            Line((-13.448853855, 11.937631954), (-11.672505677, 10.943153623))
            ThreePointArc((-11.672505677, 10.943153623), (-11.313708499, 11.313708499), (-10.943153623, 11.672505677))
            Line((-10.943153623, 11.672505677), (-11.937631954, 13.448853855))
            Line((-11.937631954, 13.448853855), (-11.171587511, 14.091641465))
            Line((-11.171587511, 14.091641465), (-9.594915403, 12.80381187))
            ThreePointArc((-9.594915403, 12.80381187), (-9.177222982, 13.106432709), (-8.749993191, 13.395432772))
            Line((-8.749993191, 13.395432772), (-9.420903537, 15.31748358))
            Line((-9.420903537, 15.31748358), (-8.554878134, 15.81748358))
            Line((-8.554878134, 15.81748358), (-7.22578848, 14.275432772))
            ThreePointArc((-7.22578848, 14.275432772), (-6.761892188, 14.500924593), (-6.290968643, 14.711346421))
            Line((-6.290968643, 14.711346421), (-6.617925734, 16.720699317))
            Line((-6.617925734, 16.720699317), (-5.678233113, 17.062719461))
            Line((-5.678233113, 17.062719461), (-4.637109631, 15.313301874))
            ThreePointArc((-4.637109631, 15.313301874), (-4.141104722, 15.454813221), (-3.640796197, 15.580263254))
            Line((-3.640796197, 15.580263254), (-3.613865606, 17.615865067))
            Line((-3.613865606, 17.615865067), (-2.629057853, 17.789513245))
            Line((-2.629057853, 17.789513245), (-1.907534551, 15.885884046))
            ThreePointArc((-1.907534551, 15.885884046), (-1.394491884, 15.939115169), (-0.88, 15.975781671))
        make_face()
        with Locations(Location((0, 0, 0), (0, 0, 270))):
            Circle(SKETCH1_3_R, mode=Mode.SUBTRACT)
    extrude(amount=CUT_EXTRUDE2_DEPTH, mode=Mode.SUBTRACT)

    # Boss-Extrude4 outline → Boss-Extrude4 (add)
    with SkipClean():  # the faces are left unmerged after this step: merging them gives an invalid solid
        with BuildSketch(Plane.XZ.offset(-8)):
            with BuildLine():
                ThreePointArc((-6.000083651, 9.350459677), (0, 11.11), (6.000083651, 9.350459677))
                Line((6.000083651, 9.350459677), (31, 9.350459677))
                Line((31, 9.350459677), (31, 13.559806323))
                ThreePointArc((31, 13.559806323), (26.310889132, 17.5), (31, 21.440193677))
                Line((31, 21.440193677), (31, 39.230090492))
                ThreePointArc((31, 39.230090492), (11.080446462, 48.75678113), (-11, 48.774993593))
                Line((-11, 48.774993593), (-11, 9.350459677))
                Line((-11, 9.350459677), (-6.000083651, 9.350459677))
            make_face()
            with BuildLine():
                Line((-5, 15.350459677), (-5, 43.714985989))
                ThreePointArc((-5, 43.714985989), (10.681278396, 42.683841109), (25, 36.20773398))
                Line((25, 36.20773398), (25, 15.350459677))
                Line((25, 15.350459677), (-5, 15.350459677))
            make_face(mode=Mode.SUBTRACT)
        extrude(amount=BOSS_EXTRUDE4_DEPTH)

    # Sketch5<4> → Boss-Extrude5 (add)
    with SkipClean():  # the faces are left unmerged after this step: merging them gives an invalid solid
        with BuildSketch(Plane.XZ.offset(-8)):
            with BuildLine():
                Line((31, 30.850459677), (31, 22.850459677))
                Line((31, 22.850459677), (37.601283123, 22.850459677))
                ThreePointArc((37.601283123, 22.850459677), (34.718210549, 27.030461636), (31.372745141, 30.850459677))
                Line((31.372745141, 30.850459677), (31, 30.850459677))
            make_face()
            with BuildLine():
                ThreePointArc((31.372745141, 30.850459677), (34.718210549, 27.030461636), (37.601283123, 22.850459677))
                Line((37.601283123, 22.850459677), (39, 22.850459677))
                Line((39, 22.850459677), (39, 30.850459677))
                Line((39, 30.850459677), (31.372745141, 30.850459677))
            make_face()
            with Locations((-15, 26.850459677)):
                Rectangle(SKETCH5_4_W, SKETCH5_4_H)
        extrude(amount=BOSS_EXTRUDE5_DEPTH)

    # Sketch5<5> → Boss-Extrude6 (add)
    with SkipClean():  # the faces are left unmerged after this step: merging them gives an invalid solid
        with BuildSketch(Plane.XZ.offset(-8)):
            with Locations((-15, 26.850459677)):
                Rectangle(SKETCH5_5_W, SKETCH5_5_H)
            with BuildLine():
                Line((3.984617675, -34.649540323), (15, -34.649540323))
                Line((15, -34.649540323), (15, -14.649540323))
                Line((15, -14.649540323), (-15, -14.649540323))
                Line((-15, -14.649540323), (-15, -34.649540323))
                Line((-15, -34.649540323), (-3.984617675, -34.649540323))
                ThreePointArc((-3.984617675, -34.649540323), (0, -31), (3.984617675, -34.649540323))
            make_face()
        extrude(amount=-BOSS_EXTRUDE6_DEPTH)

    # Sketch8 → Cut-Extrude3 (cut)
    with SkipClean():  # the faces are left unmerged after this step: merging them gives an invalid solid
        with BuildSketch(Plane(origin=(0, 0, 22.850459677), x_dir=(-1, 0, 0), z_dir=(0, 0, -1))):
            with Locations((14.071152292, -2)):
                Circle(SKETCH8_R)
            with Locations((14.071152292, -12)):
                Circle(SKETCH8_R)
            with Locations((-33.928847708, -2)):
                Circle(SKETCH8_R_2)
            with Locations((-33.928847708, -12)):
                Circle(SKETCH8_R_2)
        extrude(amount=-CUT_EXTRUDE3_DEPTH, mode=Mode.SUBTRACT)

    # Boss-Extrude7 outline → Boss-Extrude7 (add)
    with SkipClean():  # the faces are left unmerged after this step: merging them gives an invalid solid
        with BuildSketch(Plane.XZ.offset(-8)):
            with BuildLine():
                ThreePointArc((-3.984617675, -34.649540323), (0, -31), (3.984617675, -34.649540323))
                Line((3.984617675, -34.649540323), (15, -34.649540323))
                Line((15, -34.649540323), (15, -14.649540323))
                Line((15, -14.649540323), (-15, -14.649540323))
                Line((-15, -14.649540323), (-15, -34.649540323))
                Line((-15, -34.649540323), (-3.984617675, -34.649540323))
            make_face()
        extrude(amount=BOSS_EXTRUDE7_DEPTH)

    # Chamfer3
    # the kernel refuses this chamfer: 5 mm, written as the material it takes off along each edge
    with BuildSketch(Plane(origin=(0, 8, 0), x_dir=(0.003141587485879406, 0, 0.9999950652018582), z_dir=(-0.9999950652018582, 0, 0.003141587485879406))) as chamfer3_piece_1_section:
        Polygon((11.11 + CHAMFER3_SIZE, 0), (11.11, CHAMFER3_SIZE), (11.11, 0), align=None)
    chamfer3_piece_1 = revolve(axis=Axis((0, 8, 0), (0, 1, 0)), revolution_arc=359.64, mode=Mode.PRIVATE)
    chamfer3_piece_1 = split(chamfer3_piece_1, bisect_by=Plane(origin=(7.319628452, 10.442250887, 9.350459677), z_dir=(0, 0, -1)), keep=Keep.TOP, mode=Mode.PRIVATE)
    chamfer3_piece_1 = split(chamfer3_piece_1, bisect_by=Plane(origin=(7.319628452, 10.442250887, -14.649540323), z_dir=(0, 0, 1)), keep=Keep.TOP, mode=Mode.PRIVATE)
    add(chamfer3_piece_1, mode=Mode.SUBTRACT)
    with BuildSketch(Plane(origin=(0, 8, 0), x_dir=(0.003141587485879406, 0, 0.9999950652018582), z_dir=(-0.9999950652018582, 0, 0.003141587485879406))) as chamfer3_piece_2_section:
        Polygon((11.11 + CHAMFER3_SIZE, 0), (11.11, CHAMFER3_SIZE), (11.11, 0), align=None)
    chamfer3_piece_2 = revolve(axis=Axis((0, 8, 0), (0, 1, 0)), revolution_arc=359.64, mode=Mode.PRIVATE)
    chamfer3_piece_2 = split(chamfer3_piece_2, bisect_by=Plane(origin=(-11, 8.420331781, 9.97792902), z_dir=(-1, 0, 0)), keep=Keep.TOP, mode=Mode.PRIVATE)
    add(chamfer3_piece_2, mode=Mode.SUBTRACT)

    # Sketch9 → Cut-Extrude4 (cut)
    with BuildSketch(Plane.XY.offset(-14.649540323)):
        with Locations((0, -7)):
            Circle(SKETCH9_R)
        with Locations((0, -7)):
            Circle(SKETCH9_R_2, mode=Mode.SUBTRACT)
    extrude(amount=-CUT_EXTRUDE4_DEPTH, mode=Mode.SUBTRACT)

    # Sketch9<2> → Cut-Extrude5 (cut, through all)
    with BuildSketch(Plane.XY.offset(-14.649540323)):
        with Locations((0, -7)):
            Circle(SKETCH9_2_R)
    extrude(amount=-CUT_EXTRUDE5_DEPTH, mode=Mode.SUBTRACT)

    # Sketch11 → Cut-Extrude6 (cut)
    with BuildSketch(Plane(origin=(0, 0, -34.649540323), x_dir=(-1, 0, 0), z_dir=(0, 0, -1))):
        with Locations((0, -7)):
            Circle(SKETCH11_R)
    extrude(amount=-CUT_EXTRUDE6_DEPTH, mode=Mode.SUBTRACT)

    # Sketch12 → Cut-Extrude9 (cut, through all)
    with BuildSketch(Plane.XY.offset(-14.649540323)):
        with BuildLine():
            ThreePointArc((0, -22), (-10.606601732, -17.606601704), (-15, -6.99999996))
            Line((-15, -6.99999996), (-15, -22))
            Line((-15, -22), (0, -22))
        make_face()
        with BuildLine():
            Line((15, -22), (15, -7))
            ThreePointArc((15, -7), (10.606601718, -17.606601718), (0, -22))
            Line((0, -22), (15, -22))
        make_face()
    extrude(amount=-CUT_EXTRUDE9_DEPTH, mode=Mode.SUBTRACT)


solid = part.part
